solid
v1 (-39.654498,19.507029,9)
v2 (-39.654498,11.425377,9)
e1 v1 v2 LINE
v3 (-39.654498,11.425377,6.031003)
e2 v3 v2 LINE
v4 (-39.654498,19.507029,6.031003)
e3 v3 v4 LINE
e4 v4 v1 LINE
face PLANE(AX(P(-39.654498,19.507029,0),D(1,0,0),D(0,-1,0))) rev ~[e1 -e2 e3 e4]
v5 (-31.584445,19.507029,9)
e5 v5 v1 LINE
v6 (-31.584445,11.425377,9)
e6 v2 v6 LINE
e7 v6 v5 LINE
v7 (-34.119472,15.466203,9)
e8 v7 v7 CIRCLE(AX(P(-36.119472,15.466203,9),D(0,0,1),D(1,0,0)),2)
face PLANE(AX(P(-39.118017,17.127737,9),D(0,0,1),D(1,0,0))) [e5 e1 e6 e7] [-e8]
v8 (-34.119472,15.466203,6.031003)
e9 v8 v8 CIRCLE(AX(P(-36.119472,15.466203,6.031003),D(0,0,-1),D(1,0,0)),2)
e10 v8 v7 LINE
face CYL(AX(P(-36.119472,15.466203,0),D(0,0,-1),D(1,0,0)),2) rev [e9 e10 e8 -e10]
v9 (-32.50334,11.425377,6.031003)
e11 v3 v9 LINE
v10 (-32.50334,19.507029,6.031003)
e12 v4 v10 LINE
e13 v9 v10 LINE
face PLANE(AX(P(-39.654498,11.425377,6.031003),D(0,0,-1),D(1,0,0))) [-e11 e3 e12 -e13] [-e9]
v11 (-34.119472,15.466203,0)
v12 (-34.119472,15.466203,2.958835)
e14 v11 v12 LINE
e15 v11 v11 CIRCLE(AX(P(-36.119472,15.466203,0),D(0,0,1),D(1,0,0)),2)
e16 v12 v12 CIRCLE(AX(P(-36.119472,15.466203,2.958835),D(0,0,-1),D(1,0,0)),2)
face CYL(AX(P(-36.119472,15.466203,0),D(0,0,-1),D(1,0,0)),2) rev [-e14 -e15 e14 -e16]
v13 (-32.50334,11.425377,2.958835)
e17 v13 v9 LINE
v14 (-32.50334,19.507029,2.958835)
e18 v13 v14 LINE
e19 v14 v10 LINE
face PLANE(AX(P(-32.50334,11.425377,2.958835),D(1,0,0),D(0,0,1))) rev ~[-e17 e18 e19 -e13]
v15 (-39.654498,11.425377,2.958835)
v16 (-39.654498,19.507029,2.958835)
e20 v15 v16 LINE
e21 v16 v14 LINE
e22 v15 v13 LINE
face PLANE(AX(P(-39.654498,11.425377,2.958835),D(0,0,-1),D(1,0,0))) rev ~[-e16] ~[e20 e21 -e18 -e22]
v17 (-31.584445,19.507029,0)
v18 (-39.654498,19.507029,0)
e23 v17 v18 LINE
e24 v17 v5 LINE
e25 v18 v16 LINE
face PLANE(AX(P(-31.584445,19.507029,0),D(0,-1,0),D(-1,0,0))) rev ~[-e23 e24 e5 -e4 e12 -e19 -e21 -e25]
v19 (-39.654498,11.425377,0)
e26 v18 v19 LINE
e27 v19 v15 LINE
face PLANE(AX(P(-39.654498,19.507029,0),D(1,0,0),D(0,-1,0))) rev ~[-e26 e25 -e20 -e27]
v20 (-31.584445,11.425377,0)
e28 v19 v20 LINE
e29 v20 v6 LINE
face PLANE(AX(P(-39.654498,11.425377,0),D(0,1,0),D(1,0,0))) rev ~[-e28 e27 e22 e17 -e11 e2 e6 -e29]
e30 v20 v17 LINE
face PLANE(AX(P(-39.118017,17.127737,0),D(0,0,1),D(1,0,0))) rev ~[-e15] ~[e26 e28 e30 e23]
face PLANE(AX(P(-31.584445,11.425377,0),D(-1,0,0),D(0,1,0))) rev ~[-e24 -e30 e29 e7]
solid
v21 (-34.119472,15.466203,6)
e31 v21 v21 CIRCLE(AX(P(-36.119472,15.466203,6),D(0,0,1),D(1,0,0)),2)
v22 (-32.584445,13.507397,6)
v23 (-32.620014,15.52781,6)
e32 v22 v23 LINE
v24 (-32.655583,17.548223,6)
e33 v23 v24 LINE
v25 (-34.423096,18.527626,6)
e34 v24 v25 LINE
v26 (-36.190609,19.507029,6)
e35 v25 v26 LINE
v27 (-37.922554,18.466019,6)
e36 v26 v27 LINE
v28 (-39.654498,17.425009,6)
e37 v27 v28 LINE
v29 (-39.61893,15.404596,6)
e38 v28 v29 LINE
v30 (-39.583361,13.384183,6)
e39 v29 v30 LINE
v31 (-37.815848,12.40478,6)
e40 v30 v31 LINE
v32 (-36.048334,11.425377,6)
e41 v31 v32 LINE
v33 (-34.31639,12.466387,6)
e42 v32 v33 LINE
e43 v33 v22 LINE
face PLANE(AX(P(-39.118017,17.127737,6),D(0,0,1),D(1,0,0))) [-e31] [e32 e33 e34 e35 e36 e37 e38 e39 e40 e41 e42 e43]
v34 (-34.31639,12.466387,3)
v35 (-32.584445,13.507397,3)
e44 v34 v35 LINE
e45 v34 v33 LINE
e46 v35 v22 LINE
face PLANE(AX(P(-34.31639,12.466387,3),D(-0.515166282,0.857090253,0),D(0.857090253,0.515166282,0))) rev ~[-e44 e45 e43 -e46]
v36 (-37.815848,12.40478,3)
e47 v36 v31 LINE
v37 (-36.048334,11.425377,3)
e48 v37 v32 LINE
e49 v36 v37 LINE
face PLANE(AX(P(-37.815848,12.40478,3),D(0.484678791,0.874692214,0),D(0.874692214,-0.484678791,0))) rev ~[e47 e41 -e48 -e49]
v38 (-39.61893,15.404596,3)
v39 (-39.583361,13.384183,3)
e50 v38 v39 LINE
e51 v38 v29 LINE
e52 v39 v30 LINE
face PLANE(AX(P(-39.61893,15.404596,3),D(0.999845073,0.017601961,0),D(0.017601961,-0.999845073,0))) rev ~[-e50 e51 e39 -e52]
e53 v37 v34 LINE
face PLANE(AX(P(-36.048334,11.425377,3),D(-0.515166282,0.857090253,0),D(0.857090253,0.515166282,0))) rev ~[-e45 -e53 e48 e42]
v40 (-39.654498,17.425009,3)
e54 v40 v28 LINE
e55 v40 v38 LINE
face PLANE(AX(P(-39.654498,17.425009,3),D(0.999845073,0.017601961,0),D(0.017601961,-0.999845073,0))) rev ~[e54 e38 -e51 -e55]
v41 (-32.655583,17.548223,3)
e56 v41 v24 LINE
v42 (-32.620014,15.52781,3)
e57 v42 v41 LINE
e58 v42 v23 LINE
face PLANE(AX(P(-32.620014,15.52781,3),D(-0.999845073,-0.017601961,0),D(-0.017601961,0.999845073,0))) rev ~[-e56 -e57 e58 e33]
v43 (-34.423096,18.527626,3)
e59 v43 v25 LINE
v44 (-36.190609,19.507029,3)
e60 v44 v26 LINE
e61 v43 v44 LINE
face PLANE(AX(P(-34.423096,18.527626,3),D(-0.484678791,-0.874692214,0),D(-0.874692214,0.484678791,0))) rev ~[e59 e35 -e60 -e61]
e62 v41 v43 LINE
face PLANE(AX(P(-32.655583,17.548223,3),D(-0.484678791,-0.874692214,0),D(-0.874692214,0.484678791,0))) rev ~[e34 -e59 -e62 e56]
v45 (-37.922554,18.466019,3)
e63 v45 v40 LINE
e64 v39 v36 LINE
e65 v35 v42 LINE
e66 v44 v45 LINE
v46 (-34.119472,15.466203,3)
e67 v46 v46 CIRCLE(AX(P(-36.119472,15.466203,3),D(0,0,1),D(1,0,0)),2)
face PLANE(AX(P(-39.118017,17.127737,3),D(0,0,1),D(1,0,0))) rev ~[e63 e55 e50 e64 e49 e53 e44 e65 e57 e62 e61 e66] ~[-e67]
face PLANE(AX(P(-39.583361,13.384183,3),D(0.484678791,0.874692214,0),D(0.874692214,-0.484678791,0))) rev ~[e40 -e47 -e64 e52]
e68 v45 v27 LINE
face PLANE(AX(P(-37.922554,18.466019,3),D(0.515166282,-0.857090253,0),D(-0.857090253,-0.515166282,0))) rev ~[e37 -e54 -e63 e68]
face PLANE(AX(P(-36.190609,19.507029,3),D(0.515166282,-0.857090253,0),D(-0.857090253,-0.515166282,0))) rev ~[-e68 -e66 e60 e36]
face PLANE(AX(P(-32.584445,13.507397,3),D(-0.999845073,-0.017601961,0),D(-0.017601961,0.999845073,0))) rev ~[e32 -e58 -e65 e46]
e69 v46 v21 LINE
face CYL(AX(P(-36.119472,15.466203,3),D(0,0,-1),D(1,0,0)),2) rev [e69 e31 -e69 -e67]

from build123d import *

# Parameters (mm, degrees)
F1_START = 3
F0_R     = 2
F1_DEPTH = 3
F2_DEPTH = 9
F3_W     = 7.1511580269
F3_H     = 3.0721682124
F4_DEPTH = 25


with BuildPart() as f1:
    # F0 (on Top) → F1 (new body)
    with BuildSketch(Plane.XY.offset(F1_START)):
        with BuildLine():
            ThreePointArc((-39.6189296859, 15.4045963577), (-39.1808945494, 17.1625789331), (-37.9225537154, 18.4660189438))
            Line((-37.9225537154, 18.4660189438), (-39.6544984202, 17.4250089553))
            Line((-39.6544984202, 17.4250089553), (-39.6189296859, 15.4045963577))
        make_face()
        with BuildLine():
            Line((-39.5833609418, 13.3841831991), (-37.8158476605, 12.4047801734))
            ThreePointArc((-37.8158476605, 12.4047801734), (-39.1192878718, 13.6631210573), (-39.6189296859, 15.4045963577))
            Line((-39.6189296859, 15.4045963577), (-39.5833609418, 13.3841831991))
        make_face()
        with BuildLine():
            Line((-36.0483344454, 11.4253771844), (-34.3163899469, 12.4663870488))
            ThreePointArc((-34.3163899469, 12.4663870488), (-36.0578650476, 11.9667451837), (-37.8158476605, 12.4047801734))
            Line((-37.8158476605, 12.4047801734), (-36.0483344454, 11.4253771844))
        make_face()
        with BuildLine():
            ThreePointArc((-32.6200141688, 15.5278099302), (-32.6196074877, 15.4970076286), (-32.6194719238, 15.4662029406))
            ThreePointArc((-32.6194719238, 15.4662029406), (-33.0730981024, 13.7429483046), (-34.3163899469, 12.4663870488))
            Line((-34.3163899469, 12.4663870488), (-32.5844454274, 13.5073969259))
            Line((-32.5844454274, 13.5073969259), (-32.6200141688, 15.5278099302))
        make_face()
        with BuildLine():
            ThreePointArc((-34.4230959253, 18.5276255628), (-33.1196560035, 17.26928487), (-32.6200141688, 15.5278099302))
            Line((-32.6200141688, 15.5278099302), (-32.6555829058, 17.5482226822))
            Line((-32.6555829058, 17.5482226822), (-34.4230959253, 18.5276255628))
        make_face()
        with BuildLine():
            ThreePointArc((-37.9225537154, 18.4660189438), (-36.1810785423, 18.9656607021), (-34.4230959253, 18.5276255628))
            Line((-34.4230959253, 18.5276255628), (-36.1906094022, 19.5070286969))
            Line((-36.1906094022, 19.5070286969), (-37.9225537154, 18.4660189438))
        make_face()
        with BuildLine():
            ThreePointArc((-34.3163899469, 12.4663870488), (-33.0730981024, 13.7429483046), (-32.6194719238, 15.4662029406))
            ThreePointArc((-32.6194719238, 15.4662029406), (-32.6196074877, 15.4970076286), (-32.6200141688, 15.5278099302))
            ThreePointArc((-32.6200141688, 15.5278099302), (-33.1196560035, 17.26928487), (-34.4230959253, 18.5276255628))
            ThreePointArc((-34.4230959253, 18.5276255628), (-36.1810785423, 18.9656607021), (-37.9225537154, 18.4660189438))
            ThreePointArc((-37.9225537154, 18.4660189438), (-39.1808945494, 17.1625789331), (-39.6189296859, 15.4045963577))
            ThreePointArc((-39.6189296859, 15.4045963577), (-39.1192878718, 13.6631210573), (-37.8158476605, 12.4047801734))
            ThreePointArc((-37.8158476605, 12.4047801734), (-36.0578650476, 11.9667451837), (-34.3163899469, 12.4663870488))
        make_face()
        with Locations((-36.1194719238, 15.4662029406)):
            Circle(F0_R, mode=Mode.SUBTRACT)
    extrude(amount=F1_DEPTH)


with BuildPart() as f2:
    # F0 (on Top) → F2 (new body)
    with BuildSketch(Plane.XY):
        with BuildLine():
            ThreePointArc((-39.6189296859, 15.4045963577), (-39.1808945494, 17.1625789331), (-37.9225537154, 18.4660189438))
            Line((-37.9225537154, 18.4660189438), (-39.6544984202, 17.4250089553))
            Line((-39.6544984202, 17.4250089553), (-39.6189296859, 15.4045963577))
        make_face()
        Polygon((-36.0483344454, 11.4253771844), (-37.8158476605, 12.4047801734), (-39.5833609418, 13.3841831991), (-39.6189296859, 15.4045963577), (-39.6544984202, 17.4250089553), (-39.6544984202, 11.4253771844), align=None)
        Polygon((-32.5844454274, 13.5073969259), (-34.3163899469, 12.4663870488), (-36.0483344454, 11.4253771844), (-32.5844454274, 11.4253771844), align=None)
        with BuildLine():
            ThreePointArc((-34.3163899469, 12.4663870488), (-33.0730981024, 13.7429483046), (-32.6194719238, 15.4662029406))
            ThreePointArc((-32.6194719238, 15.4662029406), (-32.6196074877, 15.4970076286), (-32.6200141688, 15.5278099302))
            ThreePointArc((-32.6200141688, 15.5278099302), (-33.1196560035, 17.26928487), (-34.4230959253, 18.5276255628))
            ThreePointArc((-34.4230959253, 18.5276255628), (-36.1810785423, 18.9656607021), (-37.9225537154, 18.4660189438))
            ThreePointArc((-37.9225537154, 18.4660189438), (-39.1808945494, 17.1625789331), (-39.6189296859, 15.4045963577))
            ThreePointArc((-39.6189296859, 15.4045963577), (-39.1192878718, 13.6631210573), (-37.8158476605, 12.4047801734))
            ThreePointArc((-37.8158476605, 12.4047801734), (-36.0578650476, 11.9667451837), (-34.3163899469, 12.4663870488))
        make_face()
        with Locations((-36.1194719238, 15.4662029406)):
            Circle(F0_R, mode=Mode.SUBTRACT)
        with BuildLine():
            ThreePointArc((-32.6200141688, 15.5278099302), (-32.6196074877, 15.4970076286), (-32.6194719238, 15.4662029406))
            ThreePointArc((-32.6194719238, 15.4662029406), (-33.0730981024, 13.7429483046), (-34.3163899469, 12.4663870488))
            Line((-34.3163899469, 12.4663870488), (-32.5844454274, 13.5073969259))
            Line((-32.5844454274, 13.5073969259), (-32.6200141688, 15.5278099302))
        make_face()
        Polygon((-39.6544984202, 17.4250089553), (-37.9225537154, 18.4660189438), (-36.1906094022, 19.5070286969), (-39.6544984202, 19.5070286969), align=None)
        Polygon((-32.5844454274, 19.5070286969), (-32.5844454274, 13.5073969259), (-32.5844454274, 11.4253771844), (-31.5844454274, 11.4253771844), (-31.5844454274, 19.5070286969), align=None)
        with BuildLine():
            ThreePointArc((-37.9225537154, 18.4660189438), (-36.1810785423, 18.9656607021), (-34.4230959253, 18.5276255628))
            Line((-34.4230959253, 18.5276255628), (-36.1906094022, 19.5070286969))
            Line((-36.1906094022, 19.5070286969), (-37.9225537154, 18.4660189438))
        make_face()
        Polygon((-32.6555829058, 17.5482226822), (-32.6200141688, 15.5278099302), (-32.5844454274, 13.5073969259), (-32.5844454274, 19.5070286969), (-36.1906094022, 19.5070286969), (-34.4230959253, 18.5276255628), align=None)
        with BuildLine():
            Line((-36.0483344454, 11.4253771844), (-34.3163899469, 12.4663870488))
            ThreePointArc((-34.3163899469, 12.4663870488), (-36.0578650476, 11.9667451837), (-37.8158476605, 12.4047801734))
            Line((-37.8158476605, 12.4047801734), (-36.0483344454, 11.4253771844))
        make_face()
        with BuildLine():
            Line((-39.5833609418, 13.3841831991), (-37.8158476605, 12.4047801734))
            ThreePointArc((-37.8158476605, 12.4047801734), (-39.1192878718, 13.6631210573), (-39.6189296859, 15.4045963577))
            Line((-39.6189296859, 15.4045963577), (-39.5833609418, 13.3841831991))
        make_face()
        with BuildLine():
            ThreePointArc((-34.4230959253, 18.5276255628), (-33.1196560035, 17.26928487), (-32.6200141688, 15.5278099302))
            Line((-32.6200141688, 15.5278099302), (-32.6555829058, 17.5482226822))
            Line((-32.6555829058, 17.5482226822), (-34.4230959253, 18.5276255628))
        make_face()
    extrude(amount=F2_DEPTH)

    # F3 (on face) → F4 (cut)
    with BuildSketch(Plane.XZ.offset(-11.4253771844)):
        with Locations((-36.0789194067, 4.4949187431)):
            Rectangle(F3_W, F3_H)
    extrude(amount=-F4_DEPTH, mode=Mode.SUBTRACT)


solid = Compound([f1.part, f2.part])
